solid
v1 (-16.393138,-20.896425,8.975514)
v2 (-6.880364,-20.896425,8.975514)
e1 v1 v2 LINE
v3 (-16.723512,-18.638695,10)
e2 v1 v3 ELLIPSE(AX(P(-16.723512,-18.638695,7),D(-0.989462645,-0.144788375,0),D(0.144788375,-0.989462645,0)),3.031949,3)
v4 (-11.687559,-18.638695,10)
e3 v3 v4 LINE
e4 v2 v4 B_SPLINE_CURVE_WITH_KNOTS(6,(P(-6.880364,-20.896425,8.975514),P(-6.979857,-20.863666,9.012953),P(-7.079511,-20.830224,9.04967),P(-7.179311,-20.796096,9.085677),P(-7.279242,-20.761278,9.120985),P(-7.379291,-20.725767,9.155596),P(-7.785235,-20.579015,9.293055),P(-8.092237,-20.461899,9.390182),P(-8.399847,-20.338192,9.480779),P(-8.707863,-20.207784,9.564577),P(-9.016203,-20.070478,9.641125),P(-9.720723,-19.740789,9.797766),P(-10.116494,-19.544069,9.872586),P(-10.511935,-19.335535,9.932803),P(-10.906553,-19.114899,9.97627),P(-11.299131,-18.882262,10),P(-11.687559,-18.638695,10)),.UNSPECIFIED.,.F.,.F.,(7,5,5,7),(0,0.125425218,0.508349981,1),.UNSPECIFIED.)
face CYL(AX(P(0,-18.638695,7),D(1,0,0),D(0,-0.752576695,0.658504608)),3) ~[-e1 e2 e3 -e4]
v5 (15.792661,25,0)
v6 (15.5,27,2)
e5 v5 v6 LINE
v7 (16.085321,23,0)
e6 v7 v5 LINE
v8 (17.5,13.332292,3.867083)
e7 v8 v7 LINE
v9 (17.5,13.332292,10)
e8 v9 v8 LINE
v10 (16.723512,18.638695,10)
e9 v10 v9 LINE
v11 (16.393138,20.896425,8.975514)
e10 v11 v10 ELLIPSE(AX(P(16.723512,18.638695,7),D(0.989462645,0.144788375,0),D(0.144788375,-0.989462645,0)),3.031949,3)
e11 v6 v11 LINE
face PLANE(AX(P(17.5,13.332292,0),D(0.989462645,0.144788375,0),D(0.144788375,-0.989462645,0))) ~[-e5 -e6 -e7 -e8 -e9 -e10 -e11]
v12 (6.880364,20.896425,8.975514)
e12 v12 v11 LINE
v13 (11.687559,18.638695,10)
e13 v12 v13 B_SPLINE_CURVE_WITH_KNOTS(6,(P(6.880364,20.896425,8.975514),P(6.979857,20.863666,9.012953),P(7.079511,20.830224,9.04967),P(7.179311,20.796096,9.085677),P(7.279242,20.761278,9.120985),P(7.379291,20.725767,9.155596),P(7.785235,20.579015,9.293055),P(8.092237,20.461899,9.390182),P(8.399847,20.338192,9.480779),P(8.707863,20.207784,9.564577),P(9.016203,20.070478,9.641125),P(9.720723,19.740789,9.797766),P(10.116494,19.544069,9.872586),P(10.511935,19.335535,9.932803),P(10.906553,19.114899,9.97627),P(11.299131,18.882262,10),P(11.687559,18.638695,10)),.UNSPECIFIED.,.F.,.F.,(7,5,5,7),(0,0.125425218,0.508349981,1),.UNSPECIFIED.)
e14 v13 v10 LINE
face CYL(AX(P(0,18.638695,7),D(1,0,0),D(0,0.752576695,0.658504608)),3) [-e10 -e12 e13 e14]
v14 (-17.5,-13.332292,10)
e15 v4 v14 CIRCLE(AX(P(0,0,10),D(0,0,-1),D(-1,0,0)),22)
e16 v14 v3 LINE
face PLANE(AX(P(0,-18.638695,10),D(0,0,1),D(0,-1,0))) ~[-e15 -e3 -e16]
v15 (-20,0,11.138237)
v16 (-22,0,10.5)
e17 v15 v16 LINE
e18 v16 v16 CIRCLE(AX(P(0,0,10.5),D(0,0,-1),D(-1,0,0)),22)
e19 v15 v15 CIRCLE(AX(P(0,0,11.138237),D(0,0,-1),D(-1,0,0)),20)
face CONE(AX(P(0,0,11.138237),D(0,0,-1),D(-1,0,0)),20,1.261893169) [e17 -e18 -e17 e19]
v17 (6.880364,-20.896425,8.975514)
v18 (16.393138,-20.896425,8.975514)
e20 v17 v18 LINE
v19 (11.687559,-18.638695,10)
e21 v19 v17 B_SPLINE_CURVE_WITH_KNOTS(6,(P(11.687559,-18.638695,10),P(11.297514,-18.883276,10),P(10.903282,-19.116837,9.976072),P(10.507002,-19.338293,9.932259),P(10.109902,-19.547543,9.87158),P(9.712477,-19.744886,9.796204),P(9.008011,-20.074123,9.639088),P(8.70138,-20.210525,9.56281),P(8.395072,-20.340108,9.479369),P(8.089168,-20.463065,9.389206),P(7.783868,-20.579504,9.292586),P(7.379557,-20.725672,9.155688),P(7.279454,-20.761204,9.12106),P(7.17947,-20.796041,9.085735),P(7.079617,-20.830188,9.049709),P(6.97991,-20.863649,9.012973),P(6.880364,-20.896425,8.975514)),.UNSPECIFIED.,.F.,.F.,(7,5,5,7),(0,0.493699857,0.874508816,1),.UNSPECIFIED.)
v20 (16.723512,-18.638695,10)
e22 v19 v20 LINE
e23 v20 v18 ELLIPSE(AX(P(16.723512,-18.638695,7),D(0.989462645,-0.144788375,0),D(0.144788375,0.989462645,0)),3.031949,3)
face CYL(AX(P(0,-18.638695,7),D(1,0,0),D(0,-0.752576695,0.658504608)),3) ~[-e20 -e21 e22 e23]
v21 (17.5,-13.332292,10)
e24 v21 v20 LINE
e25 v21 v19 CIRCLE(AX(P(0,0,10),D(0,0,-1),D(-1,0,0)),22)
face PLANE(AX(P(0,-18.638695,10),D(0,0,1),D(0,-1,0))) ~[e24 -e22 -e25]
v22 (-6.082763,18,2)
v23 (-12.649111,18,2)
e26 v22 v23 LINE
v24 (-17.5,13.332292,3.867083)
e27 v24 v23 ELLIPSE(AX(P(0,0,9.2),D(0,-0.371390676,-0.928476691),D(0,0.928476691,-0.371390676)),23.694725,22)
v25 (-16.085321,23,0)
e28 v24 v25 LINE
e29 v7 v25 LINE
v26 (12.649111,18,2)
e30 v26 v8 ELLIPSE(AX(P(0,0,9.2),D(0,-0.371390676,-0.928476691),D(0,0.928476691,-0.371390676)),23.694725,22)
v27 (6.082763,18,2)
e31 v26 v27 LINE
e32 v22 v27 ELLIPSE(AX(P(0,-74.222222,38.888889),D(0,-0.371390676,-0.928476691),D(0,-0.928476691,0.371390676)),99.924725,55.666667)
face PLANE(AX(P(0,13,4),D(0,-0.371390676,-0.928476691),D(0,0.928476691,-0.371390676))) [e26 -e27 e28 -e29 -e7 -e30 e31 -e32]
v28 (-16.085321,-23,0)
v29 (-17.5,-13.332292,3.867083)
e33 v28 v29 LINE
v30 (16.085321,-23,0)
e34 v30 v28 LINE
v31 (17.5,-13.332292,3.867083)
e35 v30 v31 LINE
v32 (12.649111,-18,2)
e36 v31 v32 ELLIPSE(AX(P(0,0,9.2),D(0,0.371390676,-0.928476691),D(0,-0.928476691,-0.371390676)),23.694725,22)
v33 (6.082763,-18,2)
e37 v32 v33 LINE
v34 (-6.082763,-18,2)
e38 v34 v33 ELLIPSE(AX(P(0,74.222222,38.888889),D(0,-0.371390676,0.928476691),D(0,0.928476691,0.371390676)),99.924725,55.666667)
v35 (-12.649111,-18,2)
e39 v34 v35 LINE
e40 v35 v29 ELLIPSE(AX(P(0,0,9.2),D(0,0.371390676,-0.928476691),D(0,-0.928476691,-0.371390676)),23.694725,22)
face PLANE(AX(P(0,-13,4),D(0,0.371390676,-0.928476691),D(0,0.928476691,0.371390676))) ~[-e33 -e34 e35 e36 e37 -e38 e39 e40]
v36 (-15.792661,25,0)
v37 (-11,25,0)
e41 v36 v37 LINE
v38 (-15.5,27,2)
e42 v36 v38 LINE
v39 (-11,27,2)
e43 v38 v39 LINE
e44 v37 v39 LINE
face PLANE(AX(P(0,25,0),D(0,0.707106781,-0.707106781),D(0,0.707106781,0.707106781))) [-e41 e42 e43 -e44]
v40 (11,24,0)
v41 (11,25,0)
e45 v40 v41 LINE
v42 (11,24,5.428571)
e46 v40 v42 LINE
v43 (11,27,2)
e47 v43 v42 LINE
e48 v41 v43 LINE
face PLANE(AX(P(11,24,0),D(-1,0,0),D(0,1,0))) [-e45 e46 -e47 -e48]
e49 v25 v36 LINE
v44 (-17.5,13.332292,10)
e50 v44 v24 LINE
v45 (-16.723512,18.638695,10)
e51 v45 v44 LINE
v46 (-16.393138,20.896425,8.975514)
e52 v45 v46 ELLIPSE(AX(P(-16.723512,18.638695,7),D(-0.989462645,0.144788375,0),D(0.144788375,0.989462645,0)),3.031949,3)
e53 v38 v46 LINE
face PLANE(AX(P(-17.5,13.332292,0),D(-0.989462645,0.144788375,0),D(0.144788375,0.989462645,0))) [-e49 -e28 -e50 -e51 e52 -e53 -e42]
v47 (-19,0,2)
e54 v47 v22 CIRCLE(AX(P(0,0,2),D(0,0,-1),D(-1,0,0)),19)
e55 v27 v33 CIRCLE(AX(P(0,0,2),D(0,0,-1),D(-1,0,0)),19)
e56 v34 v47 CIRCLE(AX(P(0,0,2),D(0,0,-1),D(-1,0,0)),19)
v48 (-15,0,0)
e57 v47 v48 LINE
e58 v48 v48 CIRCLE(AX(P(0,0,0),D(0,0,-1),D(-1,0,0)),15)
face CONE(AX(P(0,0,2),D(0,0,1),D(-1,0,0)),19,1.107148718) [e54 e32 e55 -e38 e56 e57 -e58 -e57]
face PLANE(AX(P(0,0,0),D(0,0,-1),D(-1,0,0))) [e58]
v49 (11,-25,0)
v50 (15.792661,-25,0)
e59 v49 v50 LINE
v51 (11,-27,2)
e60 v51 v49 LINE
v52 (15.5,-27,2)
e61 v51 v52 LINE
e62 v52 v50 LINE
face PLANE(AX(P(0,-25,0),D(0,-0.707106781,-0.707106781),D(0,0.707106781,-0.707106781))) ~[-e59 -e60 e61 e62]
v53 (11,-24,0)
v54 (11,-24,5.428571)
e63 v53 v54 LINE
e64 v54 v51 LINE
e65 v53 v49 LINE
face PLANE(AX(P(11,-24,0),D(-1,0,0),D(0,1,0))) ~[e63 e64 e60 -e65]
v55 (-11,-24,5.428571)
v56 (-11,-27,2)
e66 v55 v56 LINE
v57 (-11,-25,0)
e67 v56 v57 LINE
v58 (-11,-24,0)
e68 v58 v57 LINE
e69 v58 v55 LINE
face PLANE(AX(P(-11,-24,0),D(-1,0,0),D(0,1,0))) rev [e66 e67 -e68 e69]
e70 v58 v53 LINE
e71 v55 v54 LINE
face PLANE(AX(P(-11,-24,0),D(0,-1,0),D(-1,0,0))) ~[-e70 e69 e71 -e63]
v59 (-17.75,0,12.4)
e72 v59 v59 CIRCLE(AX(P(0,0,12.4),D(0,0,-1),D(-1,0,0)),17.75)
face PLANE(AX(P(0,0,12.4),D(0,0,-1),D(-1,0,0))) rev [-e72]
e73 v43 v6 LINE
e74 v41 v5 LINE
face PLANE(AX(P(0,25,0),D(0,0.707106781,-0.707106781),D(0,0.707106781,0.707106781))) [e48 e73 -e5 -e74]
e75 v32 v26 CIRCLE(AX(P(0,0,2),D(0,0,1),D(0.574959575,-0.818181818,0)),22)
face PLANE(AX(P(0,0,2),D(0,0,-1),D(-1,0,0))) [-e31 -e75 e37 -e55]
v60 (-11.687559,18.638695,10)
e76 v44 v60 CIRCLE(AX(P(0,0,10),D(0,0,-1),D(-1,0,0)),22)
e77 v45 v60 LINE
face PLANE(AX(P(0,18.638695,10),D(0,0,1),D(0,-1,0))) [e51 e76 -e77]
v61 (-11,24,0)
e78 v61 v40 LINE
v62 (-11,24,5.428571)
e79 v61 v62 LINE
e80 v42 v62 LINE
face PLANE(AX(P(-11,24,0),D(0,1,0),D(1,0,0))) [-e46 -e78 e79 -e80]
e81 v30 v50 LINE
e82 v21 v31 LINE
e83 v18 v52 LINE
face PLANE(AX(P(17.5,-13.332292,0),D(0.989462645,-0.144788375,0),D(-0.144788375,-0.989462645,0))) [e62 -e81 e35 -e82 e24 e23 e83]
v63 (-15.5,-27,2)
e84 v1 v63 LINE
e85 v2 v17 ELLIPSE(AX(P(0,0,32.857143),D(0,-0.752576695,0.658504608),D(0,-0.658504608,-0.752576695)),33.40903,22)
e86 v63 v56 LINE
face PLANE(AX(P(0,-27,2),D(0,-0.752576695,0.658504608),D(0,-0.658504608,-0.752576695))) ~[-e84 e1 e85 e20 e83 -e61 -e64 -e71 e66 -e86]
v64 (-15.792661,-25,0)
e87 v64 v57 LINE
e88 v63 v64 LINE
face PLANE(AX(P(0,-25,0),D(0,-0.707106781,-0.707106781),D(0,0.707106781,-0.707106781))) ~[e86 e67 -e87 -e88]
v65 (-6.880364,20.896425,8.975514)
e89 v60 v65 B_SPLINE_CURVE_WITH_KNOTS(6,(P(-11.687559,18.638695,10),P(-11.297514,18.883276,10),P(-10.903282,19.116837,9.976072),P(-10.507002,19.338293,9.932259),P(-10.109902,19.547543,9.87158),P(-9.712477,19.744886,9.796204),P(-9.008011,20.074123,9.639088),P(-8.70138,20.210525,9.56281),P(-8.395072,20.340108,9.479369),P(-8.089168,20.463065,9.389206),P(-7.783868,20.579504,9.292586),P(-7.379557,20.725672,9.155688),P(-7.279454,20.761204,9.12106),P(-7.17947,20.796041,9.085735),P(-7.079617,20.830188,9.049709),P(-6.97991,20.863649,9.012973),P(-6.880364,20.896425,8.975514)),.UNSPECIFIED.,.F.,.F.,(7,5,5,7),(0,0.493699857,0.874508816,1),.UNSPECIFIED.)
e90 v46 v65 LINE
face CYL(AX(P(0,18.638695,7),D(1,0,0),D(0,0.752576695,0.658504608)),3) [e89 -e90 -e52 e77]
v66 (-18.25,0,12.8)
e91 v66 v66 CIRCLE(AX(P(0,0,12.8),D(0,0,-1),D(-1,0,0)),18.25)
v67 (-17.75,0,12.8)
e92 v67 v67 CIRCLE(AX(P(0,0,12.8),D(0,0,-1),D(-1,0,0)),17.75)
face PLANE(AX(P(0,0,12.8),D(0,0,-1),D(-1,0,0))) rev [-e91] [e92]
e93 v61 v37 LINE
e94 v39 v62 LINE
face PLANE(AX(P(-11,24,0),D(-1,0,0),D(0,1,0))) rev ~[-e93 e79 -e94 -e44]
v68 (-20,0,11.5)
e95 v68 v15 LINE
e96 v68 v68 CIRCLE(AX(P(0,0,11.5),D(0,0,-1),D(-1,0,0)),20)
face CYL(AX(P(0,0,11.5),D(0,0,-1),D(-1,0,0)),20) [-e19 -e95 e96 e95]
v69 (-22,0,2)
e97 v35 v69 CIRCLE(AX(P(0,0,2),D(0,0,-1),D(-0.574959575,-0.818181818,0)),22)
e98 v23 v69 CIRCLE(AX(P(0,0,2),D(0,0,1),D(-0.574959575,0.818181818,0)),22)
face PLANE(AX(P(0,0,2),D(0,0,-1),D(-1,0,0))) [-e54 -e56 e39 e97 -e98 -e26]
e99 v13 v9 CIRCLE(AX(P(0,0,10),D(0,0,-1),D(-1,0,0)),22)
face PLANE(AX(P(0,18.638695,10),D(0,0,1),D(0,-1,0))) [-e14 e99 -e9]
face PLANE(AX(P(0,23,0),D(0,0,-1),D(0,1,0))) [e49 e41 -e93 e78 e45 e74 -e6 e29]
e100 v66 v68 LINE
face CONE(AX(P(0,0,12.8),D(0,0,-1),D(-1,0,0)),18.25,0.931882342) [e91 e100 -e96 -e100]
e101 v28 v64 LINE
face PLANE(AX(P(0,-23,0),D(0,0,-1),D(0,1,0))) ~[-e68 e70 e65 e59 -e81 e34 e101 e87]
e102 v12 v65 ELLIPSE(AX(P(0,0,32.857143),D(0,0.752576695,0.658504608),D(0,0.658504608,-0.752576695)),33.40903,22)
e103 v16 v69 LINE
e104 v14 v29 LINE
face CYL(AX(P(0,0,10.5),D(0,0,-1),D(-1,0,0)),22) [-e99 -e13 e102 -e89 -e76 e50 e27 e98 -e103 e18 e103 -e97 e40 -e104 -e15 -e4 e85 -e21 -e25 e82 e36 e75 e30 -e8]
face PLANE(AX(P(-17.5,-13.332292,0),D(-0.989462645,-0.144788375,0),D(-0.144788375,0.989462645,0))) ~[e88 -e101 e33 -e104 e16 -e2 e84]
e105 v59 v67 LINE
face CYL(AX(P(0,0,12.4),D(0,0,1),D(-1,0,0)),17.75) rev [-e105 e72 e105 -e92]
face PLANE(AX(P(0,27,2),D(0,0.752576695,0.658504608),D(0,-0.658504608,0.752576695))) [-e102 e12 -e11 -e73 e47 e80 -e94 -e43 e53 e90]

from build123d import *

# Parameters (mm, degrees)
F3_DEPTH         = 17.5
F5_DEPTH         = 12.801
F5_COPIES2_COUNT = 2
F6_W             = 22
F6_H             = 3
F7_DEPTH         = 12.801


# Not quite as in the source:
# - a pattern or mirror of a feature is missing from the dataset's text; its kind, count and spacing are read off the source's solid


with BuildPart() as f1:
    # F0 (on Front) → F1 (revolve)
    with BuildSketch(Plane.XZ):
        Polygon((-15, 0), (0, 0), (0, 12.4), (-17.75, 12.4), (-17.75, 12.8), (-18.25, 12.8), (-20, 11.5), (-20, 11.1382370815), (-22, 10.5), (-22, 2), (-19, 2), align=None)
    revolve(axis=Axis((0, 0, 3.4052523688), (0, 0, -1)))

    # F2 (on Right) → F3 (join, symmetric)
    with BuildSketch(Plane.YZ):
        with BuildLine():
            Line((23, 0), (25, 0))
            Line((25, 0), (27, 2))
            Line((27, 2), (20.8964254043, 8.9755138236))
            ThreePointArc((20.8964254043, 8.9755138236), (19.8783441675, 9.7318987418), (18.6386953202, 10))
            Line((18.6386953202, 10), (13, 10))
            Line((13, 10), (13, 4))
            Line((13, 4), (23, 0))
        make_face()
    f3 = extrude(amount=F3_DEPTH, both=True)

    # F3_copies: F3 across plane
    add(f3.mirror(Plane(origin=(0, 0, 0), x_dir=(0, 0, -1), z_dir=(0, -1, 0))))

    # F4 (on Top) → F5 (cut, through all)
    with BuildSketch(Plane.XY):
        Polygon((-17.5, 27), (-17.5, 13.332291626), (-15.5, 27), align=None)
    f5 = extrude(amount=F5_DEPTH, mode=Mode.SUBTRACT)

    # F5_copies: F5 across plane
    add(f5.mirror(Plane(origin=(0, 0, 0), x_dir=(0, 0, 1), z_dir=(1, 0, 0))), mode=Mode.SUBTRACT)

    # F5_copies1: F5 across plane
    add(f5.mirror(Plane(origin=(0, 0, 0), x_dir=(0, 0, -1), z_dir=(0, -1, 0))), mode=Mode.SUBTRACT)

    # F5_copies2: F5 ×2 about axis
    f5_copies2_axis = Axis((0, 0, 0), (0, 0, 1))
    for i in range(1, F5_COPIES2_COUNT):
        add(f5.rotate(f5_copies2_axis, i * 360 / F5_COPIES2_COUNT), mode=Mode.SUBTRACT)

    # F6 (on Top) → F7 (cut, through all)
    with BuildSketch(Plane.XY):
        with Locations((0, 25.5)):
            Rectangle(F6_W, F6_H)
    f7 = extrude(amount=F7_DEPTH, mode=Mode.SUBTRACT)

    # F7_copies: F7 across plane
    add(f7.mirror(Plane(origin=(0, 0, 0), x_dir=(0, 0, -1), z_dir=(0, -1, 0))), mode=Mode.SUBTRACT)


solid = f1.part
